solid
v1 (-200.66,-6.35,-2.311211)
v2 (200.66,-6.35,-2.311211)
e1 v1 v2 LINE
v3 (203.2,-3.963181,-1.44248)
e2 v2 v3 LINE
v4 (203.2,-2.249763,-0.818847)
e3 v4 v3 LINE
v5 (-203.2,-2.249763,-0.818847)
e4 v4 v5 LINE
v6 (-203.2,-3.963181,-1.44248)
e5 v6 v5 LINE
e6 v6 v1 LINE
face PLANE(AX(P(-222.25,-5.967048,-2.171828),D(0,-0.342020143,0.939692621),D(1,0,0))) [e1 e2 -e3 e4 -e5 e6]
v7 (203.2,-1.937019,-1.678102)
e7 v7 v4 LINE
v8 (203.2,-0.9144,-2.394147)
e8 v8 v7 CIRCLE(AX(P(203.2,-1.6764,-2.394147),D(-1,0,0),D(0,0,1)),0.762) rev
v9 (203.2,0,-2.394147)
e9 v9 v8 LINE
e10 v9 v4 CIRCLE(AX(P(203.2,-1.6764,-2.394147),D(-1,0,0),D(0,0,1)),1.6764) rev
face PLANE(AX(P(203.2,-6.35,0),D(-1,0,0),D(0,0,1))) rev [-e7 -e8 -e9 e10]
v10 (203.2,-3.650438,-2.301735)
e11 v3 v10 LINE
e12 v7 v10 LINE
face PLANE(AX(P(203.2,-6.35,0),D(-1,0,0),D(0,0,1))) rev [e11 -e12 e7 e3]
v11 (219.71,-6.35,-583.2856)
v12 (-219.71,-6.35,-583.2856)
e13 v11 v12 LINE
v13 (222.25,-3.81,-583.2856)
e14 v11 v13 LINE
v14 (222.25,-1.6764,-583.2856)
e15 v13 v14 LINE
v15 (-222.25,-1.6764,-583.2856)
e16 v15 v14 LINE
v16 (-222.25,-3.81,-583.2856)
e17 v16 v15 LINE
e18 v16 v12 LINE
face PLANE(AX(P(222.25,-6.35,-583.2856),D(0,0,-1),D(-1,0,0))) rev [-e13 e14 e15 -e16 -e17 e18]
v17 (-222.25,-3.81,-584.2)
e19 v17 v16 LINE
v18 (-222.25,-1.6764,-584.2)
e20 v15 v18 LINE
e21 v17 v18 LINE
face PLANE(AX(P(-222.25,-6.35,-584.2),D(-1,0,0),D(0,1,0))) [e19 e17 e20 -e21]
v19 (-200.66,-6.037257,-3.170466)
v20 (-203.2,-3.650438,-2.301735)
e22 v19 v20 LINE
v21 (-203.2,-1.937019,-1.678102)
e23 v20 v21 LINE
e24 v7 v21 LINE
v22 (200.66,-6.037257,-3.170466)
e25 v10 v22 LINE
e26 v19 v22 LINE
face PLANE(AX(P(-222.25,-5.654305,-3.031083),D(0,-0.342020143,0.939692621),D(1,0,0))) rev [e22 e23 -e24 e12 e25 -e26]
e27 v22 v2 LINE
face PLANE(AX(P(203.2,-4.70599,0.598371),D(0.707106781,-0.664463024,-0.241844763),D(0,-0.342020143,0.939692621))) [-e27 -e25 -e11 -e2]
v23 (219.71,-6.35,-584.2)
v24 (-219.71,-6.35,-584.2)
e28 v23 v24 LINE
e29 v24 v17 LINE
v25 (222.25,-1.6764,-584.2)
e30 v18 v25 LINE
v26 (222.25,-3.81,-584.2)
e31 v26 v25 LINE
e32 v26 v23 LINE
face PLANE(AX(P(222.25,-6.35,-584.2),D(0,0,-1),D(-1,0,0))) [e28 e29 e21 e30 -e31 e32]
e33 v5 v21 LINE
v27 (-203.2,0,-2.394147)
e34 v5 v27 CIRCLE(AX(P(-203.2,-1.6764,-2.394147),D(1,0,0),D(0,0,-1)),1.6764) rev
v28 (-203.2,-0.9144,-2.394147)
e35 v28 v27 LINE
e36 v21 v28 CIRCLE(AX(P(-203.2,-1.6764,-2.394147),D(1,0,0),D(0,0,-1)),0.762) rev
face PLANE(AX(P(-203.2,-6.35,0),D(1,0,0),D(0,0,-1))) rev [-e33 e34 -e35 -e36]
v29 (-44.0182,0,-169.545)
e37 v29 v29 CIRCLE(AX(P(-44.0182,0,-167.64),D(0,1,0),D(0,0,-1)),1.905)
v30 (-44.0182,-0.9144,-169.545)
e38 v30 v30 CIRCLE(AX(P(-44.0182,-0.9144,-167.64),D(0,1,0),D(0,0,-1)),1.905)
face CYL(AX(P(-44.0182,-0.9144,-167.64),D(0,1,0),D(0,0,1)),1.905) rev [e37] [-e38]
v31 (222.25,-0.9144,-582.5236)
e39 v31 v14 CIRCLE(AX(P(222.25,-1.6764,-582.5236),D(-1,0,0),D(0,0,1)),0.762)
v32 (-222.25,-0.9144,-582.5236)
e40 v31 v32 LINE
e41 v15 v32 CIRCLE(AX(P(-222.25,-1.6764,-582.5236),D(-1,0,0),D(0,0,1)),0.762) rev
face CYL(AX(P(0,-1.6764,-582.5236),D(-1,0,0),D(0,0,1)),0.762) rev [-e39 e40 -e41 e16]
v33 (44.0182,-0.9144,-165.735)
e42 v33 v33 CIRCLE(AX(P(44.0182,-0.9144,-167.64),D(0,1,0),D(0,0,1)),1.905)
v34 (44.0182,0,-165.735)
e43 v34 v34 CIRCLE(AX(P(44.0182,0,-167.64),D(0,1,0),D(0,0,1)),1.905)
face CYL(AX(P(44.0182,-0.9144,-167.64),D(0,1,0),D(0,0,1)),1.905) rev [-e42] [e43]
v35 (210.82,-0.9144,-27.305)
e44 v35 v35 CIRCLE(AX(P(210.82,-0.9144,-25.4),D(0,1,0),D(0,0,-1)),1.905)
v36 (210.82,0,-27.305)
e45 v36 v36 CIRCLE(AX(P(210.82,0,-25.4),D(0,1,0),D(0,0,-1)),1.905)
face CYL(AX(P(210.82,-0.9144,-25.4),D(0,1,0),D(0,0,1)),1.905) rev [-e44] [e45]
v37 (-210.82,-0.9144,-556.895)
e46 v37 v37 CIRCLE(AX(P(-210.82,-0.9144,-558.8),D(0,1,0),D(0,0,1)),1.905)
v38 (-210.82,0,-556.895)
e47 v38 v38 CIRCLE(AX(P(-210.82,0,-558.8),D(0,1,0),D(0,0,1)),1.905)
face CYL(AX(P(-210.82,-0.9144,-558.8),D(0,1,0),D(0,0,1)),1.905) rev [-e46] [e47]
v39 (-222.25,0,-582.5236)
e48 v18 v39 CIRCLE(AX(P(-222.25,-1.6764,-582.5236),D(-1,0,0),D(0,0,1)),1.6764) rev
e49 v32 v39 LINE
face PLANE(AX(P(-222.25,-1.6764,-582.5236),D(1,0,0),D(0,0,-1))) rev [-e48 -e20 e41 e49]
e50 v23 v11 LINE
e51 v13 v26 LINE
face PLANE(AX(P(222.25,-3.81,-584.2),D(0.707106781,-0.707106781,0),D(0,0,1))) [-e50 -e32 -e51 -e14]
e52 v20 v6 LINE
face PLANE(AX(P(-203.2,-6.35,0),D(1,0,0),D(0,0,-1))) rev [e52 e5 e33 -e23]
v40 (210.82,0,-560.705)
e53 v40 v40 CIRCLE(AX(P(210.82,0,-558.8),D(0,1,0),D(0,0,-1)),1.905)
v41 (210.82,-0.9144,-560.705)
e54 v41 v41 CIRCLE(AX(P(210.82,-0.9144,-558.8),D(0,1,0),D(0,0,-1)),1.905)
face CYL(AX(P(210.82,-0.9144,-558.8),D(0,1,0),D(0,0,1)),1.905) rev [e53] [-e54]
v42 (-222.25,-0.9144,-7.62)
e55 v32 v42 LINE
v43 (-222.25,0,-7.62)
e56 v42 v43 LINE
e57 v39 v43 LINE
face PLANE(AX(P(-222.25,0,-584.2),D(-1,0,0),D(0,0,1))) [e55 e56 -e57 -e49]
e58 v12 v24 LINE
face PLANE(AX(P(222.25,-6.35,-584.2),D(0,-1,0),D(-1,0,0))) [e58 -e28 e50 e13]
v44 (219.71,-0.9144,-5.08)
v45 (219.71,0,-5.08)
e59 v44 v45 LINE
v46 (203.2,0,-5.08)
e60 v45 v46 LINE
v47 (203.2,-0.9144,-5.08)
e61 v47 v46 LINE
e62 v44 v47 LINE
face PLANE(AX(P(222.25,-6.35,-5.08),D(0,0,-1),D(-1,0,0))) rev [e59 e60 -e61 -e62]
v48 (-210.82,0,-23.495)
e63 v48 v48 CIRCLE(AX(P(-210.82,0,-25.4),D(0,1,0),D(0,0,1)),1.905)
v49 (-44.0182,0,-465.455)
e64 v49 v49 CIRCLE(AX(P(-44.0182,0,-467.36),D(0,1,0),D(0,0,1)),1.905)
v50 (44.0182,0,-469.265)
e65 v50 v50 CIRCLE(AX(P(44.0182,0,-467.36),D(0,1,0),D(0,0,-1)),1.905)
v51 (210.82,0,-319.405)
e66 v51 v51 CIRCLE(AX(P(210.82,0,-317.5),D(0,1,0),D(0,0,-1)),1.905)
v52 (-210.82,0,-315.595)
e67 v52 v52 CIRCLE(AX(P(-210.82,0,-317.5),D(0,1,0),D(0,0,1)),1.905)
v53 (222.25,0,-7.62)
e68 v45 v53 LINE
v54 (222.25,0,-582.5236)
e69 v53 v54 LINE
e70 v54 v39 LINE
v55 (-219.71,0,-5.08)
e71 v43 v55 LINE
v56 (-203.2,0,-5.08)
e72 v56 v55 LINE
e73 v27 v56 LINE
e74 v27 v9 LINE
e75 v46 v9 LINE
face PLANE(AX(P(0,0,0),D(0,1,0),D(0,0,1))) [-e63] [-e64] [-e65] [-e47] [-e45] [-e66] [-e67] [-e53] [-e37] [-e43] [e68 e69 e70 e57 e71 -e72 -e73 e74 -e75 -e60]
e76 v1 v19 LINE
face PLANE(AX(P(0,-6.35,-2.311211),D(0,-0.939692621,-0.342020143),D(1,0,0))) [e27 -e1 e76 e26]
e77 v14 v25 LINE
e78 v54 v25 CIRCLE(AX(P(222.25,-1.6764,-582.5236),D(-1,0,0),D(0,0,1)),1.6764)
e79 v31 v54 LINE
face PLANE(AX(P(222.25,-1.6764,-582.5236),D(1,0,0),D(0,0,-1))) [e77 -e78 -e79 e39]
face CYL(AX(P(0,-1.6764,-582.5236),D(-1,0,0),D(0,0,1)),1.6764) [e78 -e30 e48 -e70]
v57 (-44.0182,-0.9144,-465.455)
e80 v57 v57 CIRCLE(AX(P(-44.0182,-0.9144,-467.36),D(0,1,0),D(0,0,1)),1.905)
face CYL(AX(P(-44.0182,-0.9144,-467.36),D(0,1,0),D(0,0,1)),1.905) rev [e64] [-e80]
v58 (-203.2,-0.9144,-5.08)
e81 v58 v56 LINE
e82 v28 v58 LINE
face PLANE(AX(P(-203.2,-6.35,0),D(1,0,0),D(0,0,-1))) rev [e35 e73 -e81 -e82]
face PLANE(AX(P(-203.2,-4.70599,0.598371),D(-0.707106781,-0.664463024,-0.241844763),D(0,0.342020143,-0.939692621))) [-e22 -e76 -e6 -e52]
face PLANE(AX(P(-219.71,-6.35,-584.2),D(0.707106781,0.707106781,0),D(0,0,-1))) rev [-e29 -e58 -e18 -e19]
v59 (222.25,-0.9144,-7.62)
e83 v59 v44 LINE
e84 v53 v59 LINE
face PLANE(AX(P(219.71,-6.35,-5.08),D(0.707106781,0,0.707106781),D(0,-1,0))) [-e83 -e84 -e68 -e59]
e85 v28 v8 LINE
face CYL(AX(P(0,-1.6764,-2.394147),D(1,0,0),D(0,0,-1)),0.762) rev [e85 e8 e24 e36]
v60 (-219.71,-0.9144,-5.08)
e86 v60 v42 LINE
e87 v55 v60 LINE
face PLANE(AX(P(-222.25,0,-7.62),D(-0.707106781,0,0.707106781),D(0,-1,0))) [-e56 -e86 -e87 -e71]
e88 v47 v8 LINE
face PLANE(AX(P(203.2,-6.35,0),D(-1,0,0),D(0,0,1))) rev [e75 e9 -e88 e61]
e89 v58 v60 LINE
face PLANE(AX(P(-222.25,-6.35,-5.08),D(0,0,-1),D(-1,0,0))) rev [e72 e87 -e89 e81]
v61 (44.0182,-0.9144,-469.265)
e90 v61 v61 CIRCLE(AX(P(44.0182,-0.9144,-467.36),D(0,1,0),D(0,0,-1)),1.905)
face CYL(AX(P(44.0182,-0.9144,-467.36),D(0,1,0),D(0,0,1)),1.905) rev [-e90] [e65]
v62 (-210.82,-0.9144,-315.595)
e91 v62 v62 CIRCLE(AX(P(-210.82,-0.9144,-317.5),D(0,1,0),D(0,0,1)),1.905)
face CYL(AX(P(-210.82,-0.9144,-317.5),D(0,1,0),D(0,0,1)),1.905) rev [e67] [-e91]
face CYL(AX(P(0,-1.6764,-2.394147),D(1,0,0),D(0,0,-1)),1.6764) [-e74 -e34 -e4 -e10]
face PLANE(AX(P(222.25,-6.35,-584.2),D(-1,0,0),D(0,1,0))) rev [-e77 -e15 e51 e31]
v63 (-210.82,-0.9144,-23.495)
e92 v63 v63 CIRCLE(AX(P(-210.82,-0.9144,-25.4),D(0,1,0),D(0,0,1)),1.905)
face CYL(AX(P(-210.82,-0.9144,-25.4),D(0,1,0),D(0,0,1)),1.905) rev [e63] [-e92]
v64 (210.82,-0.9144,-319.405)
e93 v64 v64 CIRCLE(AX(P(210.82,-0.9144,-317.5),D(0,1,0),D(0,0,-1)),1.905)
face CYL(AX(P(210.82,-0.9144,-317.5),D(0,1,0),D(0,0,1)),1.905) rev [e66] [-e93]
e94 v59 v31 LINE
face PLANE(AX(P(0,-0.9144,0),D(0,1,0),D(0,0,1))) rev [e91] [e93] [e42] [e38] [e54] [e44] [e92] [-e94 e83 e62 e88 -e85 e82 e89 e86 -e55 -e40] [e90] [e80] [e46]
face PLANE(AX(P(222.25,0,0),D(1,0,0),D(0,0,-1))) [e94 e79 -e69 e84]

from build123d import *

# Parameters (mm, degrees)
SKETCH2_W            = 444.5
SKETCH2_H            = 584.2
BOSS_EXTRUDE1_DEPTH  = 6.35
MOVE_START           = -2.17182791
MOVE_FACE1_OUTLINE_W = 448
MOVE_FACE1_OUTLINE_H = 9
MOVE_FACE1_DEPTH     = 2.17182791
CONVERT_SOLID1_START = -222.25
CONVERT_SOLID1_DEPTH = 444.5
SKETCH7_W            = 19.05
SKETCH7_H            = 5.08
CUT_EXTRUDE1_DEPTH   = 626.080014878
SKETCH9_R            = 1.905
CUT_EXTRUDE2_DEPTH   = 1.2192
CHAMFER1_SIZE        = 2.54


# Read off the part's stored shape, not the designer's step: Move Face1, Convert-Solid1
with BuildPart() as part:
    # Sketch2 → Boss-Extrude1 (new body)
    with BuildSketch(Plane(origin=(0, 0, 0), x_dir=(1, 0, 0), z_dir=(0, 1, 0))):
        with Locations((0, 292.1)):
            Rectangle(SKETCH2_W, SKETCH2_H)
    extrude(amount=-BOSS_EXTRUDE1_DEPTH)

    # Move Face1 outline → Move Face1 (cut)
    with BuildSketch(Plane(origin=(0, 0, 0), x_dir=(1, 0, 0), z_dir=(0, 0.3420201433256691, -0.9396926207859083)).offset(MOVE_START)):
        with Locations((0, 3.5)):
            Rectangle(MOVE_FACE1_OUTLINE_W, MOVE_FACE1_OUTLINE_H)
    extrude(amount=MOVE_FACE1_DEPTH, mode=Mode.SUBTRACT)

    # Convert-Solid1 outline → Convert-Solid1 (cut)
    with BuildSketch(Plane.YZ.offset(CONVERT_SOLID1_START)):
        with BuildLine():
            Line((-6.037256781, -3.17046592), (-6.35, -2.311210988))
            Line((-6.35, -2.311210988), (-6.35, -583.2856))
            Line((-6.35, -583.2856), (-1.6764, -583.2856))
            ThreePointArc((-1.6764, -583.2856), (-1.137584633, -583.062415367), (-0.9144, -582.5236))
            Line((-0.9144, -582.5236), (-0.9144, -2.394147319))
            ThreePointArc((-0.9144, -2.394147319), (-1.239334756, -1.769953461), (-1.937019349, -1.678101541))
            Line((-1.937019349, -1.678101541), (-6.037256781, -3.17046592))
        make_face()
        with BuildLine():
            Line((0, 0), (-2.249762568, -0.818846609))
            ThreePointArc((-2.249762568, -0.818846609), (-0.714856462, -1.020920831), (0, -2.394147319))
            Line((0, -2.394147319), (0, 0))
        make_face()
        with BuildLine():
            Line((0, -584.2), (0, -582.5236))
            ThreePointArc((0, -582.5236), (-0.491006192, -583.708993808), (-1.6764, -584.2))
            Line((-1.6764, -584.2), (0, -584.2))
        make_face()
    extrude(amount=CONVERT_SOLID1_DEPTH, mode=Mode.SUBTRACT)

    # Sketch7 → Cut-Extrude1 (cut, through all)
    with BuildSketch(Plane(origin=(0, 0, 0), x_dir=(1, 0, 0), z_dir=(0, 1, 0))):
        with Locations((-212.725, 2.54)):
            Rectangle(SKETCH7_W, SKETCH7_H)
        with Locations((212.725, 2.54)):
            Rectangle(SKETCH7_W, SKETCH7_H)
    extrude(amount=-CUT_EXTRUDE1_DEPTH, mode=Mode.SUBTRACT)

    # Sketch9 → Cut-Extrude2 (cut)
    with BuildSketch(Plane(origin=(0, 0, 0), x_dir=(1, 0, 0), z_dir=(0, 1, 0))):
        with Locations(Location((-210.82, 25.4, 0), (0, 0, 270))):
            Circle(SKETCH9_R)
        with Locations(Location((-210.82, 317.5, 0), (0, 0, 270))):
            Circle(SKETCH9_R)
        with Locations(Location((-210.82, 558.8, 0), (0, 0, 270))):
            Circle(SKETCH9_R)
        with Locations(Location((210.82, 558.8, 0), (0, 0, 90))):
            Circle(SKETCH9_R)
        with Locations(Location((210.82, 317.5, 0), (0, 0, 90))):
            Circle(SKETCH9_R)
        with Locations(Location((210.82, 25.4, 0), (0, 0, 90))):
            Circle(SKETCH9_R)
        with Locations(Location((-44.0182, 167.64, 0), (0, 0, 90))):
            Circle(SKETCH9_R)
        with Locations(Location((-44.0182, 467.36, 0), (0, 0, 270))):
            Circle(SKETCH9_R)
        with Locations(Location((44.0182, 467.36, 0), (0, 0, 90))):
            Circle(SKETCH9_R)
        with Locations(Location((44.0182, 167.64, 0), (0, 0, 270))):
            Circle(SKETCH9_R)
    extrude(amount=-CUT_EXTRUDE2_DEPTH, mode=Mode.SUBTRACT)

    # Chamfer1
    chamfer1_edges = [part.edges().sort_by_distance(p)[0] for p in [
        (-222.25, -6.35, -583.7428),
        (222.25, -6.35, -583.7428),
        (-222.25, -0.4572, -5.08),
        (-203.2, -6.193628391, -2.740838454),
        (222.25, -0.4572, -5.08),
        (203.2, -6.193628391, -2.740838454),
    ]]
    chamfer(chamfer1_edges, length=CHAMFER1_SIZE)


solid = part.part
